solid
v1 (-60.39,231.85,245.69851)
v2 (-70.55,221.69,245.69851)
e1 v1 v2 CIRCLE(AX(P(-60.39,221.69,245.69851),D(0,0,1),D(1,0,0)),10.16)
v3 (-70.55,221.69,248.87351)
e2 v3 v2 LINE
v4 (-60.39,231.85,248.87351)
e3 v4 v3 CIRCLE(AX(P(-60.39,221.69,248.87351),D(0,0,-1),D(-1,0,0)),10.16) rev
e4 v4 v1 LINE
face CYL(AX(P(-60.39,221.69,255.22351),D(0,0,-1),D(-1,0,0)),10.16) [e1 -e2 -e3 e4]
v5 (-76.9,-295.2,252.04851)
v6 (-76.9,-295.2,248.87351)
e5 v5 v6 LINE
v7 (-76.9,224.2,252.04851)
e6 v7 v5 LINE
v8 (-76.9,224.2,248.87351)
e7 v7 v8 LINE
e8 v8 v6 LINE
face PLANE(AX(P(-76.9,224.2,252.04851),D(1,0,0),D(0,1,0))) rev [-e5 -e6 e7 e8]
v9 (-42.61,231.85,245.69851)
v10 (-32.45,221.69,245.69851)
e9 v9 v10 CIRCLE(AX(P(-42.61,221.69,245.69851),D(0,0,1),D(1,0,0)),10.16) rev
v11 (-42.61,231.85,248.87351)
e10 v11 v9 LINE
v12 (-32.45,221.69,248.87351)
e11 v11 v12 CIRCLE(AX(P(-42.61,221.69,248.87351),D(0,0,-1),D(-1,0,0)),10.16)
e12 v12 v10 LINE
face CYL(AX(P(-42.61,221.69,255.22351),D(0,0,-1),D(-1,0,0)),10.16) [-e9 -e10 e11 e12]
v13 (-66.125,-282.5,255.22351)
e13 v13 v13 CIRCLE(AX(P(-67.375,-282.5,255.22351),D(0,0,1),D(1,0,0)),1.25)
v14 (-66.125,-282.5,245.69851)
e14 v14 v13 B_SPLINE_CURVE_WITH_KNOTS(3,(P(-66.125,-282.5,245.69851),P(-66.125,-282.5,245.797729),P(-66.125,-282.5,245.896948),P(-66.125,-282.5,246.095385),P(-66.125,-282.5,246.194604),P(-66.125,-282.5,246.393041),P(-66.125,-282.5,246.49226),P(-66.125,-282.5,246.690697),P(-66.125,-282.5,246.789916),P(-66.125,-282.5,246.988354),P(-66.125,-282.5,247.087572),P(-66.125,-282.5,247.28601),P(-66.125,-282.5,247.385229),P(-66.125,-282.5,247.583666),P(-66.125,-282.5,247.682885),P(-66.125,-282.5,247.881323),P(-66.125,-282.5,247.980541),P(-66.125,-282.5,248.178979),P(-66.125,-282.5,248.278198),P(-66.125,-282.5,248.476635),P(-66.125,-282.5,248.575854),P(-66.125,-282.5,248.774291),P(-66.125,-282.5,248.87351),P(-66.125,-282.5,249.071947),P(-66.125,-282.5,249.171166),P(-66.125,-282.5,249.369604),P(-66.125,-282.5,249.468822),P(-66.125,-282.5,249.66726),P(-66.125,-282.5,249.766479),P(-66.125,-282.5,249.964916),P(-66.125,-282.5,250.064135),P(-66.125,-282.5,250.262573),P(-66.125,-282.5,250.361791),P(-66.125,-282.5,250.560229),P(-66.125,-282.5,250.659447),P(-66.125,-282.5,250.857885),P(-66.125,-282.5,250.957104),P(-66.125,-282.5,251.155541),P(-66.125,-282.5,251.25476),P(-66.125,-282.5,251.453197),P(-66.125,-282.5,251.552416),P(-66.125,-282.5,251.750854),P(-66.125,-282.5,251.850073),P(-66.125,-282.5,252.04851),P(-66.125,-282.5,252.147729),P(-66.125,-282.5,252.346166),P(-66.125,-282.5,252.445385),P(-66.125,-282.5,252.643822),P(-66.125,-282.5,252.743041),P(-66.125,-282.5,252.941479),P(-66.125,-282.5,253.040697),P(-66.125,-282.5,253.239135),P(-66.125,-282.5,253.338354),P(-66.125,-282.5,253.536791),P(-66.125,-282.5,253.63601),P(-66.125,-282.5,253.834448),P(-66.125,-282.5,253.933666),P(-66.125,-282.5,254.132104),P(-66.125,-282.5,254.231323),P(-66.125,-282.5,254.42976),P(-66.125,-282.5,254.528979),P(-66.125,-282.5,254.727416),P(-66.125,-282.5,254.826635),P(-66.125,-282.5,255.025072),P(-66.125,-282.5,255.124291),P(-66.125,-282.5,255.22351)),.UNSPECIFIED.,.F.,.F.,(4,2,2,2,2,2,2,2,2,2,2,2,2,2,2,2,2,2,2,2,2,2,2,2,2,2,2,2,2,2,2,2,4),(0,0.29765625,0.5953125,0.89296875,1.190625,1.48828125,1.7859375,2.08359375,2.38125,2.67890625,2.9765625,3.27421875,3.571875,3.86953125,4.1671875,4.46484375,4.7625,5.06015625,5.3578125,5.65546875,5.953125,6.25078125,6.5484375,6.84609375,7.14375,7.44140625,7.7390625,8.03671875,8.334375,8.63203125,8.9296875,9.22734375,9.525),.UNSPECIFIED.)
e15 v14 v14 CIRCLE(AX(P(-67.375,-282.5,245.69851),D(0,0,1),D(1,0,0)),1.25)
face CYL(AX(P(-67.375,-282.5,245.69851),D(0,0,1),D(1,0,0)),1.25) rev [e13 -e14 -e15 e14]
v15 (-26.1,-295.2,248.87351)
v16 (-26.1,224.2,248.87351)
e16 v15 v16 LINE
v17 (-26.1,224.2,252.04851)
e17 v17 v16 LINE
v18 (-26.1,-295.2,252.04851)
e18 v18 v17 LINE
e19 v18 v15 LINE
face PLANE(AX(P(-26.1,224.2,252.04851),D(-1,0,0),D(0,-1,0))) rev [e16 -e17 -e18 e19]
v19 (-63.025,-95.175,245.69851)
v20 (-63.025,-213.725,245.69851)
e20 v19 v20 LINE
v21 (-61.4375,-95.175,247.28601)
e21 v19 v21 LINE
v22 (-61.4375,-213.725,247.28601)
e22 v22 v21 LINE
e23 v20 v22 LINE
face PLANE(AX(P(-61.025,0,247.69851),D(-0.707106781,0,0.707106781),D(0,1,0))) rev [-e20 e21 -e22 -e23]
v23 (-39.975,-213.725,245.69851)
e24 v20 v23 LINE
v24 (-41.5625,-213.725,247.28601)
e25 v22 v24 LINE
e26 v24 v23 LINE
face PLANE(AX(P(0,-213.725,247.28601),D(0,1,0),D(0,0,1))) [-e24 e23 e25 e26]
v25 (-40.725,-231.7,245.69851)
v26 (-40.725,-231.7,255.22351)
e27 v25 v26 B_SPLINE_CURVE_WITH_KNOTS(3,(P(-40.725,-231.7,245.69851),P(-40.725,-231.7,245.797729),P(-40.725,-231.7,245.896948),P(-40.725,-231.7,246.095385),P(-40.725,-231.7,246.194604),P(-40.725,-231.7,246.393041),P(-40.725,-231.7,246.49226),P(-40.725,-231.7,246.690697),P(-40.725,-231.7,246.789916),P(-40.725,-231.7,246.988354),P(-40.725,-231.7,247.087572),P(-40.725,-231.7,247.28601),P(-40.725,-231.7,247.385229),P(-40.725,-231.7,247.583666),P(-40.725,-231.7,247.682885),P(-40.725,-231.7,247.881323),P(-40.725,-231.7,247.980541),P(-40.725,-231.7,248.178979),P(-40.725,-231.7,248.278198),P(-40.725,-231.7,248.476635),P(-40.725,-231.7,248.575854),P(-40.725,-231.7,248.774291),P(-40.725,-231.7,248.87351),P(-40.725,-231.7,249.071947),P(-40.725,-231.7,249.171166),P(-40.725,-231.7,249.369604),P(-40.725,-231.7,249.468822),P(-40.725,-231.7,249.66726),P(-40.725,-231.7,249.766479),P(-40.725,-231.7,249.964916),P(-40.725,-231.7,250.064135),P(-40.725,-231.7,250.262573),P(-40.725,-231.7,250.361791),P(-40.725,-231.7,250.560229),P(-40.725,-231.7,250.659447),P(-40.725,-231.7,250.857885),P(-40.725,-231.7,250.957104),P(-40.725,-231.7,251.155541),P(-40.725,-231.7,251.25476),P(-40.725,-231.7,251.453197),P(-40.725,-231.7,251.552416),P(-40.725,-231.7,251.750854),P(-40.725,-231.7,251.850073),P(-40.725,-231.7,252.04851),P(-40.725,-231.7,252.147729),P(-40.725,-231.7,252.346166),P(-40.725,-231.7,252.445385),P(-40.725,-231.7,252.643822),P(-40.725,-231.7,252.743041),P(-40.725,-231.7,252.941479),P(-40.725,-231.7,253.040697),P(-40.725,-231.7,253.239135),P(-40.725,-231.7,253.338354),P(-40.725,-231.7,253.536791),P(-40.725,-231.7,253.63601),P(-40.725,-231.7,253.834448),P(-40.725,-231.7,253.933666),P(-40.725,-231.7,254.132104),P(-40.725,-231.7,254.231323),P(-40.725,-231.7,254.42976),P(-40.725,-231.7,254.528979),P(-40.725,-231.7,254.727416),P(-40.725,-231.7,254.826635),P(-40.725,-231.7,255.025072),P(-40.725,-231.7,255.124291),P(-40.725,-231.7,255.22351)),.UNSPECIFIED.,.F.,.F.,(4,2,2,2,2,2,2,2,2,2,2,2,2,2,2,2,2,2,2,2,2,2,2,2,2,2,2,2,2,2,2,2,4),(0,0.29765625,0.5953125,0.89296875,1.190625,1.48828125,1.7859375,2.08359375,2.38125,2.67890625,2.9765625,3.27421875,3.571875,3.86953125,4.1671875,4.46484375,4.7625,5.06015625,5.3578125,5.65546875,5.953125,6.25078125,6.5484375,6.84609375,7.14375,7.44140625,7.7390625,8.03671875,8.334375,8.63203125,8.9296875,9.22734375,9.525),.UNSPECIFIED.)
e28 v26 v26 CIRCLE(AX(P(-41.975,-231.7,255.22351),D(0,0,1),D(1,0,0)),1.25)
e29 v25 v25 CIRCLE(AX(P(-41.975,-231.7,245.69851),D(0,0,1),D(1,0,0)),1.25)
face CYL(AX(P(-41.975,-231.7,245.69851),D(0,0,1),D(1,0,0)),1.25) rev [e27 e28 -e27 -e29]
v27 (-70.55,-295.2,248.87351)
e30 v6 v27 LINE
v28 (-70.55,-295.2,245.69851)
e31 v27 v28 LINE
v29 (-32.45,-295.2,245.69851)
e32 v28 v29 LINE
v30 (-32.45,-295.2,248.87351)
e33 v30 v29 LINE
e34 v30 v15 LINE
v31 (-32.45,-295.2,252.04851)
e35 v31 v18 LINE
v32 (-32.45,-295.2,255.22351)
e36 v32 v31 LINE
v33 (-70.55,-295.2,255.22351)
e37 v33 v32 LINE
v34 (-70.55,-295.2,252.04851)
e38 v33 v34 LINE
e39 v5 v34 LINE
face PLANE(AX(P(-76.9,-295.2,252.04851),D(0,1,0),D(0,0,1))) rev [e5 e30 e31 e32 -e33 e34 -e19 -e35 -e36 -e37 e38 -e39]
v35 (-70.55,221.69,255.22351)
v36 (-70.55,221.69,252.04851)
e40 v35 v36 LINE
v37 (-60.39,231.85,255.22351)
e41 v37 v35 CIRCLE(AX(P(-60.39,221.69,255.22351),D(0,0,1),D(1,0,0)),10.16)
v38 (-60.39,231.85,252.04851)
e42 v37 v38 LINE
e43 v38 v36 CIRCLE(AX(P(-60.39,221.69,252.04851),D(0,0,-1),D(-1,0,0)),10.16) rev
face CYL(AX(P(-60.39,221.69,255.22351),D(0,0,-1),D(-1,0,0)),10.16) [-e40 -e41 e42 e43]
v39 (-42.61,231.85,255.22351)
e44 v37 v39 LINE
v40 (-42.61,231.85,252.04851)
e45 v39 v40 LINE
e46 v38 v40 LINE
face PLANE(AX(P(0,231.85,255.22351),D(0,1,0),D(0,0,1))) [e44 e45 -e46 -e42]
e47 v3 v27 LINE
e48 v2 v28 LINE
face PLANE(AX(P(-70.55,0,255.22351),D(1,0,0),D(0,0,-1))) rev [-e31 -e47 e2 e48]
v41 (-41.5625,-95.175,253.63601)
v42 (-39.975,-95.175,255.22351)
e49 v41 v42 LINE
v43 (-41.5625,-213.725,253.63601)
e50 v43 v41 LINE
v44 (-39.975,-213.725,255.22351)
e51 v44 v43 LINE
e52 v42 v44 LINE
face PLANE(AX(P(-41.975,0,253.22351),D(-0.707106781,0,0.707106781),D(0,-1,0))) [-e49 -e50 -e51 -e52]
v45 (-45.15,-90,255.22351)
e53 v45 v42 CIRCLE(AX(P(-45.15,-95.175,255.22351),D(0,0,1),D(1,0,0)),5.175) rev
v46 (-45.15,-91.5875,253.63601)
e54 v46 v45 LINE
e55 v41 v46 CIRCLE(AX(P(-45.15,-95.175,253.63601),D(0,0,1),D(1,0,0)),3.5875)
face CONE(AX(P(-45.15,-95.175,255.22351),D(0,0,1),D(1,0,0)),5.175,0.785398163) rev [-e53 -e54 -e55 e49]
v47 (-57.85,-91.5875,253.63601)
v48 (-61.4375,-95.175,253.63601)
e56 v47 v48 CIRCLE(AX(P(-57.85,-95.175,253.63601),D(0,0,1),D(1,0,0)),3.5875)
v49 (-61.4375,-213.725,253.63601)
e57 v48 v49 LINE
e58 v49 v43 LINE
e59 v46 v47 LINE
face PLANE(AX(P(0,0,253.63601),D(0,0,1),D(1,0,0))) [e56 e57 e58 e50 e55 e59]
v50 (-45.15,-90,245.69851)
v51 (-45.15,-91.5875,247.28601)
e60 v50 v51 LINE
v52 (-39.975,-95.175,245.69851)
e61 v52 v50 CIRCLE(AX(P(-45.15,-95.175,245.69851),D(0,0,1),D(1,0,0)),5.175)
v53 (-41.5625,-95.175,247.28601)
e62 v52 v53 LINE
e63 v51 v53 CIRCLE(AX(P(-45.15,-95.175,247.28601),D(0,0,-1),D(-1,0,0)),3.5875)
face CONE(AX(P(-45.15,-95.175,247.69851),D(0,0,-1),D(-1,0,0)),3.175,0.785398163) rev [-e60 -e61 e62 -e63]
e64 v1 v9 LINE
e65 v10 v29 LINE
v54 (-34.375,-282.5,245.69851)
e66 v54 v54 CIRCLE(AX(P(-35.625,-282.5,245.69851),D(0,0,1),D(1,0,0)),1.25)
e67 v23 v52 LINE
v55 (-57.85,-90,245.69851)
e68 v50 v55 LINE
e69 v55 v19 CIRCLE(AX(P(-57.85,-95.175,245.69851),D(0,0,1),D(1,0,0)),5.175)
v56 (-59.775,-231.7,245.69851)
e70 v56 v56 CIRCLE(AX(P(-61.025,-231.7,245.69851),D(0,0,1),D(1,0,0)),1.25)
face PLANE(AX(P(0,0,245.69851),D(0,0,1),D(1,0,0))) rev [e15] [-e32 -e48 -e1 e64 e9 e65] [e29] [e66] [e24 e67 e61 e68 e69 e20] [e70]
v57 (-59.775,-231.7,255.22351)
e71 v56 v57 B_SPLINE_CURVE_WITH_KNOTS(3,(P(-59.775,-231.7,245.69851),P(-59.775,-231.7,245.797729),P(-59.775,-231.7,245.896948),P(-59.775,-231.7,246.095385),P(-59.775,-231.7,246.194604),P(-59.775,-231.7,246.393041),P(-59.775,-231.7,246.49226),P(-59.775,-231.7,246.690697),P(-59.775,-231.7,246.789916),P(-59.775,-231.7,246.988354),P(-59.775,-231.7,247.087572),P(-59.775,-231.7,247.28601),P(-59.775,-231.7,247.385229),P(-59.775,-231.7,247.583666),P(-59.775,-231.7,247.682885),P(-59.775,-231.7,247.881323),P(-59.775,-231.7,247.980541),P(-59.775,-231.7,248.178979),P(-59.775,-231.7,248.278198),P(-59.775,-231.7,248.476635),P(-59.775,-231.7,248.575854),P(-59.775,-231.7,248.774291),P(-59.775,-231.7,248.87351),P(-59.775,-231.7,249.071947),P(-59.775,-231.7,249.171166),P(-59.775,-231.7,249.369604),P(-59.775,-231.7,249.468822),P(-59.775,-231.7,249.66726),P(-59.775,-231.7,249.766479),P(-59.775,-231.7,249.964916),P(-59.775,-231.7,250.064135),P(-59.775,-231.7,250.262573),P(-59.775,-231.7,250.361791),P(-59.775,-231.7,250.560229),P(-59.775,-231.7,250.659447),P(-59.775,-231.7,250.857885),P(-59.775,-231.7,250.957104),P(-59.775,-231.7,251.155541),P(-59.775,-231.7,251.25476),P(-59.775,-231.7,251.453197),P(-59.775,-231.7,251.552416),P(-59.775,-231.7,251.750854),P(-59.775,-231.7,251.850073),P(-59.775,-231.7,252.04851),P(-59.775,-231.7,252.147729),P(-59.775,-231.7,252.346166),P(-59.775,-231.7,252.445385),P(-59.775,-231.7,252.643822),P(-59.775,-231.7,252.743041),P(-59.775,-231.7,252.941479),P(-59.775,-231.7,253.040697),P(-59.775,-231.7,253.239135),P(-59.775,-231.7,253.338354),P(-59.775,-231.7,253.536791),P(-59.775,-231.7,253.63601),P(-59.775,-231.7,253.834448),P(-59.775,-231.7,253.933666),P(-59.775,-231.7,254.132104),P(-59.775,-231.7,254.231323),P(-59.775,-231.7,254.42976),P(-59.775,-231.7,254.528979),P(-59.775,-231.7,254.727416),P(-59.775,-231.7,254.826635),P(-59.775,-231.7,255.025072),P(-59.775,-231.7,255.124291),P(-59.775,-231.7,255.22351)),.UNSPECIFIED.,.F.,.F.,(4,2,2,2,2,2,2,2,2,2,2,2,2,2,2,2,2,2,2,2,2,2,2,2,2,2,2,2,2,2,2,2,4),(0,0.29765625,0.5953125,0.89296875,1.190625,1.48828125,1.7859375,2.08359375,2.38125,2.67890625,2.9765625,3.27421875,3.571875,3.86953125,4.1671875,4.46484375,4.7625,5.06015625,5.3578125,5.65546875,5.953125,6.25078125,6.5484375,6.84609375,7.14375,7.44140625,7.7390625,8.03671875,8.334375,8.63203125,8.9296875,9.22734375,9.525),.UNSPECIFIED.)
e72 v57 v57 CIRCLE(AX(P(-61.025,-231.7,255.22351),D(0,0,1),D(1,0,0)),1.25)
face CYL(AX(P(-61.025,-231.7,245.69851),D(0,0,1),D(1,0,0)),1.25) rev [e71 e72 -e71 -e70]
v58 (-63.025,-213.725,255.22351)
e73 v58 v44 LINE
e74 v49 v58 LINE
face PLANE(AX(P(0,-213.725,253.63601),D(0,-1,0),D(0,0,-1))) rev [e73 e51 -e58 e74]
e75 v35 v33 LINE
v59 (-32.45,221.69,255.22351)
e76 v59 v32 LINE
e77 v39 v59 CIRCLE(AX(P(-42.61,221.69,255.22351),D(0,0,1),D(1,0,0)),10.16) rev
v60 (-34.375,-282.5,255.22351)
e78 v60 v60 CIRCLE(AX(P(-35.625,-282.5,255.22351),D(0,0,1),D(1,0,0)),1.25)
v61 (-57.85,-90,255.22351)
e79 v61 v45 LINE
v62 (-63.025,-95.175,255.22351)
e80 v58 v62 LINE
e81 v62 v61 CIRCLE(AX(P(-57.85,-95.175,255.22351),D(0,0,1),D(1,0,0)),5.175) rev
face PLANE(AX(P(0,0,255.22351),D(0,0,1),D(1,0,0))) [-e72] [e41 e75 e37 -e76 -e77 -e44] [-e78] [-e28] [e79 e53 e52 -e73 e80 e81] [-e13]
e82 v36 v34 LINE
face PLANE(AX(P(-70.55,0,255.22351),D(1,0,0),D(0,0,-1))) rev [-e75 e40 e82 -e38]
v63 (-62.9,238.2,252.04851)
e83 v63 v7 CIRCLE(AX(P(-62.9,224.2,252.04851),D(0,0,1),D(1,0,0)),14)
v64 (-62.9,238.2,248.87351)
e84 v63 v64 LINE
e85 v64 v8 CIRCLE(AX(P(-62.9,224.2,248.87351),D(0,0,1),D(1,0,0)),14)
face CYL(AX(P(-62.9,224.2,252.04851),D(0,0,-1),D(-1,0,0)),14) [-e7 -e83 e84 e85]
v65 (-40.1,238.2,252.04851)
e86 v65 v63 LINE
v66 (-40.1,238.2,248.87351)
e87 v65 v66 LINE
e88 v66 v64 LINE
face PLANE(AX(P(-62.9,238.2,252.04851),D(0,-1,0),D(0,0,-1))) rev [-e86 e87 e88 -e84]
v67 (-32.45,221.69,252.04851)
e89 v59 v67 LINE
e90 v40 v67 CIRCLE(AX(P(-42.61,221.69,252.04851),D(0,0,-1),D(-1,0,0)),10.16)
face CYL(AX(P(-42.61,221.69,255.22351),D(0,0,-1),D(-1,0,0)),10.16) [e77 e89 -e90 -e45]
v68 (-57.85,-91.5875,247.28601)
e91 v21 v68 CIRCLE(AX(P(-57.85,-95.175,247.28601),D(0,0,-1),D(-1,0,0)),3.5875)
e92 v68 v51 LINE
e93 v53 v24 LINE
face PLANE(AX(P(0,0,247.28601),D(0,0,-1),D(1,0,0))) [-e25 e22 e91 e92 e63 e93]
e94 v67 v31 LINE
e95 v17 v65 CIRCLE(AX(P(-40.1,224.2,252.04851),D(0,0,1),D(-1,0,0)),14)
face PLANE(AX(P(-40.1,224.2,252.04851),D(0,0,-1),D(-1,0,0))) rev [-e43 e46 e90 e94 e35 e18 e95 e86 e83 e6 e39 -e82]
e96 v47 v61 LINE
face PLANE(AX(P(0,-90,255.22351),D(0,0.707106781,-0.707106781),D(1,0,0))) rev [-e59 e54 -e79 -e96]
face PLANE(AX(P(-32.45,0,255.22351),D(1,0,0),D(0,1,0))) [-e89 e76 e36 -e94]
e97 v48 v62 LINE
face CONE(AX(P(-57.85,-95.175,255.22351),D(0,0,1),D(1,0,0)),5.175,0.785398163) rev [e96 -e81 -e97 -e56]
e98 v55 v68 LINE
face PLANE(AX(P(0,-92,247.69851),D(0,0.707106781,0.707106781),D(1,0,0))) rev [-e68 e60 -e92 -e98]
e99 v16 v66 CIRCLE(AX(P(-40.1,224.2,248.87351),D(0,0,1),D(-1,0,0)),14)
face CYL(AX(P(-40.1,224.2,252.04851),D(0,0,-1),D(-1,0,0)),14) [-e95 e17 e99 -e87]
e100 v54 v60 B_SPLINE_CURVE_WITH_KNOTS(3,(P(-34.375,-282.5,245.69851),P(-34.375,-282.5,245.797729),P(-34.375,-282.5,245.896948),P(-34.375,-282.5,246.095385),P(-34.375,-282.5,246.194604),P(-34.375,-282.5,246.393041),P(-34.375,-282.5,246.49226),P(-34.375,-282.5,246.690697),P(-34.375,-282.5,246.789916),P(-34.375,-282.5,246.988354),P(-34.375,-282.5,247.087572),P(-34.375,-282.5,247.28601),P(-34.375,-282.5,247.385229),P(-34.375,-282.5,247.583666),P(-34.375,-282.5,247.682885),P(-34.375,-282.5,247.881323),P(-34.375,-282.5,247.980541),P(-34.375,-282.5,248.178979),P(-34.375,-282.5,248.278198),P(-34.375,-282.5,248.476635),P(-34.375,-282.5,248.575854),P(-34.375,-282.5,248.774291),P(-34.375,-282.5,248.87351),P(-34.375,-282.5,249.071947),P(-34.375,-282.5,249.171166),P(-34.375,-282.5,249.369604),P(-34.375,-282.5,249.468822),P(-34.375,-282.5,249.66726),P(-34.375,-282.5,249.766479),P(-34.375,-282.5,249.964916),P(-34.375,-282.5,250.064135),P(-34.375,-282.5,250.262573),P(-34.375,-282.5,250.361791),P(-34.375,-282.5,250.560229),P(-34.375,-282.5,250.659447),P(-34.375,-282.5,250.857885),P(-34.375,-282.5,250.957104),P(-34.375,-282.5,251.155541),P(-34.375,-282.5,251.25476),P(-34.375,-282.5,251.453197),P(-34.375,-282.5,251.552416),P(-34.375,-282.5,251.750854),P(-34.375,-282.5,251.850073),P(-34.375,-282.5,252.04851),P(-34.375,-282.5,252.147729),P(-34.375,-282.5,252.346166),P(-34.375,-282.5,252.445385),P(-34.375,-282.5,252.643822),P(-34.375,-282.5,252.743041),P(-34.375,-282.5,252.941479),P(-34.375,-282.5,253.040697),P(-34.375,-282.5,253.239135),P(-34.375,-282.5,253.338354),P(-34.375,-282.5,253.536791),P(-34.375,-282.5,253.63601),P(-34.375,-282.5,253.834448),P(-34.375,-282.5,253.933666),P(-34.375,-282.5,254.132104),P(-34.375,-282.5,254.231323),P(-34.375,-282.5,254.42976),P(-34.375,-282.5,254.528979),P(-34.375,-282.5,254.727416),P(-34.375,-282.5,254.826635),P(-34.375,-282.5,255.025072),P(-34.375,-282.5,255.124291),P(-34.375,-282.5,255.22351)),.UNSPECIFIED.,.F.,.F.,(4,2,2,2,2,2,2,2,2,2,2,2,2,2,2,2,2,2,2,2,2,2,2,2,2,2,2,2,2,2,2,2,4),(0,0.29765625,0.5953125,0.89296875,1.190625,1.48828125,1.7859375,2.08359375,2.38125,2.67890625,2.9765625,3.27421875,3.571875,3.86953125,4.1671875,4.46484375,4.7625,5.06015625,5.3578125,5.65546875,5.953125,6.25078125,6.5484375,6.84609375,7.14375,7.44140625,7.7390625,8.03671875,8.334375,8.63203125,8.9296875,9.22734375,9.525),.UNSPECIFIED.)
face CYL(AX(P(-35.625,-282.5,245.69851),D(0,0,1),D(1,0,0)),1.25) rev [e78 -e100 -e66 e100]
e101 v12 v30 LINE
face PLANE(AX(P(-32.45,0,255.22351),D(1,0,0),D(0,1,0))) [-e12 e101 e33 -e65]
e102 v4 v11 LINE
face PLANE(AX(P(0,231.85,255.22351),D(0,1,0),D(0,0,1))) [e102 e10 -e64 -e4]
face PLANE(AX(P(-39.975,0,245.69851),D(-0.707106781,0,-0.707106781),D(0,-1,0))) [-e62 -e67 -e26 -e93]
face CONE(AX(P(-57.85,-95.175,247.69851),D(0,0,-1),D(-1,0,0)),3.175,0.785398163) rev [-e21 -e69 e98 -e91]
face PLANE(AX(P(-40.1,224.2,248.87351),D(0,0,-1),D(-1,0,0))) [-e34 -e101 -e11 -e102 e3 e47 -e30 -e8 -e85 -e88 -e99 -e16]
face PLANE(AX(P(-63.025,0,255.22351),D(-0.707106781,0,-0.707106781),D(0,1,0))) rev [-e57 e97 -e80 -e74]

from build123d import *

# Parameters (mm, degrees)
BOSS_EXTRUDE2_DEPTH     = 1.5875
SKETCH2_W               = 38.1
SKETCH2_H               = 76.2
BOSS_EXTRUDE3_DEPTH     = 4.7625
CUT_EXTRUDE1_DEPTH      = 1.5875
CHAMFER1_SIZE           = 2
CUT_EXTRUDE2_DEPTH      = 306.117964892
CUT_EXTRUDE2_DEPTH_BACK = 306.117964892
SKETCH4_R               = 1.25


with BuildPart() as part:
    # Sketch1 → Boss-Extrude2 (new, symmetric)
    with BuildSketch(Plane.XY.offset(250.46101)):
        with BuildLine():
            Line((-62.9, 238.2), (-40.1, 238.2))
            ThreePointArc((-40.1, 238.2), (-30.200505063, 234.099494937), (-26.1, 224.2))
            Line((-26.1, 224.2), (-26.1, -219))
            Line((-26.1, -219), (-26.1, -295.2))
            Line((-26.1, -295.2), (-76.9, -295.2))
            Line((-76.9, -295.2), (-76.9, -219))
            Line((-76.9, -219), (-76.9, 224.2))
            ThreePointArc((-76.9, 224.2), (-72.799494937, 234.099494937), (-62.9, 238.2))
        make_face()
    extrude(amount=BOSS_EXTRUDE2_DEPTH, both=True)

    # Sketch2 → Boss-Extrude3 (add, symmetric)
    with BuildSketch(Plane.XY.offset(250.46101)):
        with Locations((-51.5, -257.1)):
            Rectangle(SKETCH2_W, SKETCH2_H)
        with BuildLine():
            Line((-60.39, 231.85), (-42.61, 231.85))
            ThreePointArc((-42.61, 231.85), (-35.425795103, 228.874204897), (-32.45, 221.69))
            Line((-32.45, 221.69), (-32.45, -219))
            Line((-32.45, -219), (-70.55, -219))
            Line((-70.55, -219), (-70.55, 221.69))
            ThreePointArc((-70.55, 221.69), (-67.574204897, 228.874204897), (-60.39, 231.85))
        make_face()
    extrude(amount=BOSS_EXTRUDE3_DEPTH, both=True)

    # Sketch3 → Cut-Extrude1 (cut)
    with BuildSketch(Plane.XY.offset(255.22351)):
        with BuildLine():
            Line((-61.025, -95.175), (-61.025, -213.725))
            Line((-61.025, -213.725), (-41.975, -213.725))
            Line((-41.975, -213.725), (-41.975, -95.175))
            ThreePointArc((-41.975, -95.175), (-42.90493597, -92.92993597), (-45.15, -92))
            Line((-45.15, -92), (-57.85, -92))
            ThreePointArc((-57.85, -92), (-60.09506403, -92.92993597), (-61.025, -95.175))
        make_face()
    cut_extrude1 = extrude(amount=-CUT_EXTRUDE1_DEPTH, mode=Mode.SUBTRACT)

    # Mirror2: Cut-Extrude1 across plane
    add(cut_extrude1.mirror(Plane.XY.offset(250.46101)), mode=Mode.SUBTRACT)

    # Chamfer1
    # the kernel refuses this chamfer: 2 mm, written as the material it takes off along each edge
    with BuildSketch(Plane(origin=(-41.975, -213.725, 255.22351), x_dir=(0.999621916911297, 0, 0.0274958766105822), z_dir=(0, 1, 0))) as chamfer1_piece_1_section:
        Polygon((CHAMFER1_SIZE * 0.999621916911, CHAMFER1_SIZE * 0.0274958766106), (-CHAMFER1_SIZE * 0.0274958766106, CHAMFER1_SIZE * 0.999621916911), (0, 0), align=None)
    chamfer1_piece_1 = extrude(amount=118.55, mode=Mode.PRIVATE)
    chamfer1_piece_1 = split(chamfer1_piece_1, bisect_by=Plane(origin=(-41.282092609, -154.45, 253.63601), z_dir=(0, 0, 1)), keep=Keep.TOP, mode=Mode.PRIVATE)
    add(chamfer1_piece_1, mode=Mode.SUBTRACT)
    with BuildSketch(Plane(origin=(-61.025, -95.175, 255.22351), x_dir=(-0.999621916911297, 0, 0.0274958766105822), z_dir=(0, -1, 0))) as chamfer1_piece_2_section:
        Polygon((CHAMFER1_SIZE * 0.999621916911, CHAMFER1_SIZE * 0.0274958766106), (-CHAMFER1_SIZE * 0.0274958766106, CHAMFER1_SIZE * 0.999621916911), (0, 0), align=None)
    chamfer1_piece_2 = extrude(amount=118.55, mode=Mode.PRIVATE)
    chamfer1_piece_2 = split(chamfer1_piece_2, bisect_by=Plane(origin=(-61.717907391, -154.45, 253.63601), z_dir=(0, 0, 1)), keep=Keep.TOP, mode=Mode.PRIVATE)
    add(chamfer1_piece_2, mode=Mode.SUBTRACT)
    with BuildSketch(Plane(origin=(-45.15, -95.175, 255.22351), x_dir=(1, 0, 0), z_dir=(0, -1, 0))) as chamfer1_piece_3_section:
        Polygon((3.175 + CHAMFER1_SIZE, 0), (3.175, -CHAMFER1_SIZE), (3.175, 0), align=None)
    chamfer1_piece_3 = revolve(axis=Axis((-45.15, -95.175, 255.22351), (0, 0, 1)), revolution_arc=90, mode=Mode.PRIVATE)
    chamfer1_piece_3 = split(chamfer1_piece_3, bisect_by=Plane(origin=(-42.646845167, -92.671845167, 253.63601), z_dir=(0, 0, 1)), keep=Keep.TOP, mode=Mode.PRIVATE)
    add(chamfer1_piece_3, mode=Mode.SUBTRACT)
    with BuildSketch(Plane(origin=(-57.85, -95.175, 255.22351), x_dir=(0, 1, 0), z_dir=(1, 0, 0))) as chamfer1_piece_4_section:
        Polygon((3.175 + CHAMFER1_SIZE, 0), (3.175, -CHAMFER1_SIZE), (3.175, 0), align=None)
    chamfer1_piece_4 = revolve(axis=Axis((-57.85, -95.175, 255.22351), (0, 0, 1)), revolution_arc=90, mode=Mode.PRIVATE)
    chamfer1_piece_4 = split(chamfer1_piece_4, bisect_by=Plane(origin=(-60.353154832, -92.671845168, 253.63601), z_dir=(0, 0, 1)), keep=Keep.TOP, mode=Mode.PRIVATE)
    add(chamfer1_piece_4, mode=Mode.SUBTRACT)
    with BuildSketch(Plane(origin=(-45.15, -92, 255.22351), x_dir=(0, 0.999621916911297, 0.027495876610582105), z_dir=(-1, 0, 0))) as chamfer1_piece_5_section:
        Polygon((CHAMFER1_SIZE * 0.999621916911, CHAMFER1_SIZE * 0.0274958766106), (-CHAMFER1_SIZE * 0.0274958766106, CHAMFER1_SIZE * 0.999621916911), (0, 0), align=None)
    chamfer1_piece_5 = extrude(amount=12.7, mode=Mode.PRIVATE)
    chamfer1_piece_5 = split(chamfer1_piece_5, bisect_by=Plane(origin=(-51.5, -91.307092609, 253.63601), z_dir=(0, 0, 1)), keep=Keep.TOP, mode=Mode.PRIVATE)
    add(chamfer1_piece_5, mode=Mode.SUBTRACT)
    with BuildSketch(Plane(origin=(-41.975, -213.725, 245.69851), x_dir=(0.999621916911297, 0, -0.0274958766105822), z_dir=(0, 1, 0))) as chamfer1_piece_6_section:
        Polygon((CHAMFER1_SIZE * 0.999621916911, -CHAMFER1_SIZE * 0.0274958766106), (-CHAMFER1_SIZE * 0.0274958766106, -CHAMFER1_SIZE * 0.999621916911), (0, 0), align=None)
    chamfer1_piece_6 = extrude(amount=118.55, mode=Mode.PRIVATE)
    chamfer1_piece_6 = split(chamfer1_piece_6, bisect_by=Plane(origin=(-41.282092609, -154.45, 247.28601), z_dir=(0, 0, -1)), keep=Keep.TOP, mode=Mode.PRIVATE)
    add(chamfer1_piece_6, mode=Mode.SUBTRACT)
    with BuildSketch(Plane(origin=(-61.025, -95.175, 245.69851), x_dir=(-0.999621916911297, 0, -0.0274958766105822), z_dir=(0, -1, 0))) as chamfer1_piece_7_section:
        Polygon((CHAMFER1_SIZE * 0.999621916911, -CHAMFER1_SIZE * 0.0274958766106), (-CHAMFER1_SIZE * 0.0274958766106, -CHAMFER1_SIZE * 0.999621916911), (0, 0), align=None)
    chamfer1_piece_7 = extrude(amount=118.55, mode=Mode.PRIVATE)
    chamfer1_piece_7 = split(chamfer1_piece_7, bisect_by=Plane(origin=(-61.717907391, -154.45, 247.28601), z_dir=(0, 0, -1)), keep=Keep.TOP, mode=Mode.PRIVATE)
    add(chamfer1_piece_7, mode=Mode.SUBTRACT)
    with BuildSketch(Plane(origin=(-45.15, -95.175, 245.69851), x_dir=(1, 0, 0), z_dir=(0, -1, 0))) as chamfer1_piece_8_section:
        Polygon((3.175 + CHAMFER1_SIZE, 0), (3.175, CHAMFER1_SIZE), (3.175, 0), align=None)
    chamfer1_piece_8 = revolve(axis=Axis((-45.15, -95.175, 245.69851), (0, 0, 1)), revolution_arc=90, mode=Mode.PRIVATE)
    chamfer1_piece_8 = split(chamfer1_piece_8, bisect_by=Plane(origin=(-42.646845167, -92.671845167, 247.28601), z_dir=(0, 0, -1)), keep=Keep.TOP, mode=Mode.PRIVATE)
    add(chamfer1_piece_8, mode=Mode.SUBTRACT)
    with BuildSketch(Plane(origin=(-57.85, -95.175, 245.69851), x_dir=(0, 1, 0), z_dir=(1, 0, 0))) as chamfer1_piece_9_section:
        Polygon((3.175 + CHAMFER1_SIZE, 0), (3.175, CHAMFER1_SIZE), (3.175, 0), align=None)
    chamfer1_piece_9 = revolve(axis=Axis((-57.85, -95.175, 245.69851), (0, 0, 1)), revolution_arc=90, mode=Mode.PRIVATE)
    chamfer1_piece_9 = split(chamfer1_piece_9, bisect_by=Plane(origin=(-60.353154832, -92.671845168, 247.28601), z_dir=(0, 0, -1)), keep=Keep.TOP, mode=Mode.PRIVATE)
    add(chamfer1_piece_9, mode=Mode.SUBTRACT)
    with BuildSketch(Plane(origin=(-45.15, -92, 245.69851), x_dir=(0, 0.999621916911297, -0.027495876610582105), z_dir=(-1, 0, 0))) as chamfer1_piece_10_section:
        Polygon((CHAMFER1_SIZE * 0.999621916911, -CHAMFER1_SIZE * 0.0274958766106), (-CHAMFER1_SIZE * 0.0274958766106, -CHAMFER1_SIZE * 0.999621916911), (0, 0), align=None)
    chamfer1_piece_10 = extrude(amount=12.7, mode=Mode.PRIVATE)
    chamfer1_piece_10 = split(chamfer1_piece_10, bisect_by=Plane(origin=(-51.5, -91.307092609, 247.28601), z_dir=(0, 0, -1)), keep=Keep.TOP, mode=Mode.PRIVATE)
    add(chamfer1_piece_10, mode=Mode.SUBTRACT)

    # Sketch4 → Cut-Extrude2 (cut, two sides: drawn at the far end of the back side and taken through both)
    with BuildSketch(Plane.XY.offset(252.04851).offset(-CUT_EXTRUDE2_DEPTH_BACK)):
        with Locations((-61.025, -231.7)):
            Circle(SKETCH4_R)
        with Locations((-41.975, -231.7)):
            Circle(SKETCH4_R)
        with Locations((-35.625, -282.5)):
            Circle(SKETCH4_R)
        with Locations((-67.375, -282.5)):
            Circle(SKETCH4_R)
    extrude(amount=CUT_EXTRUDE2_DEPTH + CUT_EXTRUDE2_DEPTH_BACK, mode=Mode.SUBTRACT)


solid = part.part
